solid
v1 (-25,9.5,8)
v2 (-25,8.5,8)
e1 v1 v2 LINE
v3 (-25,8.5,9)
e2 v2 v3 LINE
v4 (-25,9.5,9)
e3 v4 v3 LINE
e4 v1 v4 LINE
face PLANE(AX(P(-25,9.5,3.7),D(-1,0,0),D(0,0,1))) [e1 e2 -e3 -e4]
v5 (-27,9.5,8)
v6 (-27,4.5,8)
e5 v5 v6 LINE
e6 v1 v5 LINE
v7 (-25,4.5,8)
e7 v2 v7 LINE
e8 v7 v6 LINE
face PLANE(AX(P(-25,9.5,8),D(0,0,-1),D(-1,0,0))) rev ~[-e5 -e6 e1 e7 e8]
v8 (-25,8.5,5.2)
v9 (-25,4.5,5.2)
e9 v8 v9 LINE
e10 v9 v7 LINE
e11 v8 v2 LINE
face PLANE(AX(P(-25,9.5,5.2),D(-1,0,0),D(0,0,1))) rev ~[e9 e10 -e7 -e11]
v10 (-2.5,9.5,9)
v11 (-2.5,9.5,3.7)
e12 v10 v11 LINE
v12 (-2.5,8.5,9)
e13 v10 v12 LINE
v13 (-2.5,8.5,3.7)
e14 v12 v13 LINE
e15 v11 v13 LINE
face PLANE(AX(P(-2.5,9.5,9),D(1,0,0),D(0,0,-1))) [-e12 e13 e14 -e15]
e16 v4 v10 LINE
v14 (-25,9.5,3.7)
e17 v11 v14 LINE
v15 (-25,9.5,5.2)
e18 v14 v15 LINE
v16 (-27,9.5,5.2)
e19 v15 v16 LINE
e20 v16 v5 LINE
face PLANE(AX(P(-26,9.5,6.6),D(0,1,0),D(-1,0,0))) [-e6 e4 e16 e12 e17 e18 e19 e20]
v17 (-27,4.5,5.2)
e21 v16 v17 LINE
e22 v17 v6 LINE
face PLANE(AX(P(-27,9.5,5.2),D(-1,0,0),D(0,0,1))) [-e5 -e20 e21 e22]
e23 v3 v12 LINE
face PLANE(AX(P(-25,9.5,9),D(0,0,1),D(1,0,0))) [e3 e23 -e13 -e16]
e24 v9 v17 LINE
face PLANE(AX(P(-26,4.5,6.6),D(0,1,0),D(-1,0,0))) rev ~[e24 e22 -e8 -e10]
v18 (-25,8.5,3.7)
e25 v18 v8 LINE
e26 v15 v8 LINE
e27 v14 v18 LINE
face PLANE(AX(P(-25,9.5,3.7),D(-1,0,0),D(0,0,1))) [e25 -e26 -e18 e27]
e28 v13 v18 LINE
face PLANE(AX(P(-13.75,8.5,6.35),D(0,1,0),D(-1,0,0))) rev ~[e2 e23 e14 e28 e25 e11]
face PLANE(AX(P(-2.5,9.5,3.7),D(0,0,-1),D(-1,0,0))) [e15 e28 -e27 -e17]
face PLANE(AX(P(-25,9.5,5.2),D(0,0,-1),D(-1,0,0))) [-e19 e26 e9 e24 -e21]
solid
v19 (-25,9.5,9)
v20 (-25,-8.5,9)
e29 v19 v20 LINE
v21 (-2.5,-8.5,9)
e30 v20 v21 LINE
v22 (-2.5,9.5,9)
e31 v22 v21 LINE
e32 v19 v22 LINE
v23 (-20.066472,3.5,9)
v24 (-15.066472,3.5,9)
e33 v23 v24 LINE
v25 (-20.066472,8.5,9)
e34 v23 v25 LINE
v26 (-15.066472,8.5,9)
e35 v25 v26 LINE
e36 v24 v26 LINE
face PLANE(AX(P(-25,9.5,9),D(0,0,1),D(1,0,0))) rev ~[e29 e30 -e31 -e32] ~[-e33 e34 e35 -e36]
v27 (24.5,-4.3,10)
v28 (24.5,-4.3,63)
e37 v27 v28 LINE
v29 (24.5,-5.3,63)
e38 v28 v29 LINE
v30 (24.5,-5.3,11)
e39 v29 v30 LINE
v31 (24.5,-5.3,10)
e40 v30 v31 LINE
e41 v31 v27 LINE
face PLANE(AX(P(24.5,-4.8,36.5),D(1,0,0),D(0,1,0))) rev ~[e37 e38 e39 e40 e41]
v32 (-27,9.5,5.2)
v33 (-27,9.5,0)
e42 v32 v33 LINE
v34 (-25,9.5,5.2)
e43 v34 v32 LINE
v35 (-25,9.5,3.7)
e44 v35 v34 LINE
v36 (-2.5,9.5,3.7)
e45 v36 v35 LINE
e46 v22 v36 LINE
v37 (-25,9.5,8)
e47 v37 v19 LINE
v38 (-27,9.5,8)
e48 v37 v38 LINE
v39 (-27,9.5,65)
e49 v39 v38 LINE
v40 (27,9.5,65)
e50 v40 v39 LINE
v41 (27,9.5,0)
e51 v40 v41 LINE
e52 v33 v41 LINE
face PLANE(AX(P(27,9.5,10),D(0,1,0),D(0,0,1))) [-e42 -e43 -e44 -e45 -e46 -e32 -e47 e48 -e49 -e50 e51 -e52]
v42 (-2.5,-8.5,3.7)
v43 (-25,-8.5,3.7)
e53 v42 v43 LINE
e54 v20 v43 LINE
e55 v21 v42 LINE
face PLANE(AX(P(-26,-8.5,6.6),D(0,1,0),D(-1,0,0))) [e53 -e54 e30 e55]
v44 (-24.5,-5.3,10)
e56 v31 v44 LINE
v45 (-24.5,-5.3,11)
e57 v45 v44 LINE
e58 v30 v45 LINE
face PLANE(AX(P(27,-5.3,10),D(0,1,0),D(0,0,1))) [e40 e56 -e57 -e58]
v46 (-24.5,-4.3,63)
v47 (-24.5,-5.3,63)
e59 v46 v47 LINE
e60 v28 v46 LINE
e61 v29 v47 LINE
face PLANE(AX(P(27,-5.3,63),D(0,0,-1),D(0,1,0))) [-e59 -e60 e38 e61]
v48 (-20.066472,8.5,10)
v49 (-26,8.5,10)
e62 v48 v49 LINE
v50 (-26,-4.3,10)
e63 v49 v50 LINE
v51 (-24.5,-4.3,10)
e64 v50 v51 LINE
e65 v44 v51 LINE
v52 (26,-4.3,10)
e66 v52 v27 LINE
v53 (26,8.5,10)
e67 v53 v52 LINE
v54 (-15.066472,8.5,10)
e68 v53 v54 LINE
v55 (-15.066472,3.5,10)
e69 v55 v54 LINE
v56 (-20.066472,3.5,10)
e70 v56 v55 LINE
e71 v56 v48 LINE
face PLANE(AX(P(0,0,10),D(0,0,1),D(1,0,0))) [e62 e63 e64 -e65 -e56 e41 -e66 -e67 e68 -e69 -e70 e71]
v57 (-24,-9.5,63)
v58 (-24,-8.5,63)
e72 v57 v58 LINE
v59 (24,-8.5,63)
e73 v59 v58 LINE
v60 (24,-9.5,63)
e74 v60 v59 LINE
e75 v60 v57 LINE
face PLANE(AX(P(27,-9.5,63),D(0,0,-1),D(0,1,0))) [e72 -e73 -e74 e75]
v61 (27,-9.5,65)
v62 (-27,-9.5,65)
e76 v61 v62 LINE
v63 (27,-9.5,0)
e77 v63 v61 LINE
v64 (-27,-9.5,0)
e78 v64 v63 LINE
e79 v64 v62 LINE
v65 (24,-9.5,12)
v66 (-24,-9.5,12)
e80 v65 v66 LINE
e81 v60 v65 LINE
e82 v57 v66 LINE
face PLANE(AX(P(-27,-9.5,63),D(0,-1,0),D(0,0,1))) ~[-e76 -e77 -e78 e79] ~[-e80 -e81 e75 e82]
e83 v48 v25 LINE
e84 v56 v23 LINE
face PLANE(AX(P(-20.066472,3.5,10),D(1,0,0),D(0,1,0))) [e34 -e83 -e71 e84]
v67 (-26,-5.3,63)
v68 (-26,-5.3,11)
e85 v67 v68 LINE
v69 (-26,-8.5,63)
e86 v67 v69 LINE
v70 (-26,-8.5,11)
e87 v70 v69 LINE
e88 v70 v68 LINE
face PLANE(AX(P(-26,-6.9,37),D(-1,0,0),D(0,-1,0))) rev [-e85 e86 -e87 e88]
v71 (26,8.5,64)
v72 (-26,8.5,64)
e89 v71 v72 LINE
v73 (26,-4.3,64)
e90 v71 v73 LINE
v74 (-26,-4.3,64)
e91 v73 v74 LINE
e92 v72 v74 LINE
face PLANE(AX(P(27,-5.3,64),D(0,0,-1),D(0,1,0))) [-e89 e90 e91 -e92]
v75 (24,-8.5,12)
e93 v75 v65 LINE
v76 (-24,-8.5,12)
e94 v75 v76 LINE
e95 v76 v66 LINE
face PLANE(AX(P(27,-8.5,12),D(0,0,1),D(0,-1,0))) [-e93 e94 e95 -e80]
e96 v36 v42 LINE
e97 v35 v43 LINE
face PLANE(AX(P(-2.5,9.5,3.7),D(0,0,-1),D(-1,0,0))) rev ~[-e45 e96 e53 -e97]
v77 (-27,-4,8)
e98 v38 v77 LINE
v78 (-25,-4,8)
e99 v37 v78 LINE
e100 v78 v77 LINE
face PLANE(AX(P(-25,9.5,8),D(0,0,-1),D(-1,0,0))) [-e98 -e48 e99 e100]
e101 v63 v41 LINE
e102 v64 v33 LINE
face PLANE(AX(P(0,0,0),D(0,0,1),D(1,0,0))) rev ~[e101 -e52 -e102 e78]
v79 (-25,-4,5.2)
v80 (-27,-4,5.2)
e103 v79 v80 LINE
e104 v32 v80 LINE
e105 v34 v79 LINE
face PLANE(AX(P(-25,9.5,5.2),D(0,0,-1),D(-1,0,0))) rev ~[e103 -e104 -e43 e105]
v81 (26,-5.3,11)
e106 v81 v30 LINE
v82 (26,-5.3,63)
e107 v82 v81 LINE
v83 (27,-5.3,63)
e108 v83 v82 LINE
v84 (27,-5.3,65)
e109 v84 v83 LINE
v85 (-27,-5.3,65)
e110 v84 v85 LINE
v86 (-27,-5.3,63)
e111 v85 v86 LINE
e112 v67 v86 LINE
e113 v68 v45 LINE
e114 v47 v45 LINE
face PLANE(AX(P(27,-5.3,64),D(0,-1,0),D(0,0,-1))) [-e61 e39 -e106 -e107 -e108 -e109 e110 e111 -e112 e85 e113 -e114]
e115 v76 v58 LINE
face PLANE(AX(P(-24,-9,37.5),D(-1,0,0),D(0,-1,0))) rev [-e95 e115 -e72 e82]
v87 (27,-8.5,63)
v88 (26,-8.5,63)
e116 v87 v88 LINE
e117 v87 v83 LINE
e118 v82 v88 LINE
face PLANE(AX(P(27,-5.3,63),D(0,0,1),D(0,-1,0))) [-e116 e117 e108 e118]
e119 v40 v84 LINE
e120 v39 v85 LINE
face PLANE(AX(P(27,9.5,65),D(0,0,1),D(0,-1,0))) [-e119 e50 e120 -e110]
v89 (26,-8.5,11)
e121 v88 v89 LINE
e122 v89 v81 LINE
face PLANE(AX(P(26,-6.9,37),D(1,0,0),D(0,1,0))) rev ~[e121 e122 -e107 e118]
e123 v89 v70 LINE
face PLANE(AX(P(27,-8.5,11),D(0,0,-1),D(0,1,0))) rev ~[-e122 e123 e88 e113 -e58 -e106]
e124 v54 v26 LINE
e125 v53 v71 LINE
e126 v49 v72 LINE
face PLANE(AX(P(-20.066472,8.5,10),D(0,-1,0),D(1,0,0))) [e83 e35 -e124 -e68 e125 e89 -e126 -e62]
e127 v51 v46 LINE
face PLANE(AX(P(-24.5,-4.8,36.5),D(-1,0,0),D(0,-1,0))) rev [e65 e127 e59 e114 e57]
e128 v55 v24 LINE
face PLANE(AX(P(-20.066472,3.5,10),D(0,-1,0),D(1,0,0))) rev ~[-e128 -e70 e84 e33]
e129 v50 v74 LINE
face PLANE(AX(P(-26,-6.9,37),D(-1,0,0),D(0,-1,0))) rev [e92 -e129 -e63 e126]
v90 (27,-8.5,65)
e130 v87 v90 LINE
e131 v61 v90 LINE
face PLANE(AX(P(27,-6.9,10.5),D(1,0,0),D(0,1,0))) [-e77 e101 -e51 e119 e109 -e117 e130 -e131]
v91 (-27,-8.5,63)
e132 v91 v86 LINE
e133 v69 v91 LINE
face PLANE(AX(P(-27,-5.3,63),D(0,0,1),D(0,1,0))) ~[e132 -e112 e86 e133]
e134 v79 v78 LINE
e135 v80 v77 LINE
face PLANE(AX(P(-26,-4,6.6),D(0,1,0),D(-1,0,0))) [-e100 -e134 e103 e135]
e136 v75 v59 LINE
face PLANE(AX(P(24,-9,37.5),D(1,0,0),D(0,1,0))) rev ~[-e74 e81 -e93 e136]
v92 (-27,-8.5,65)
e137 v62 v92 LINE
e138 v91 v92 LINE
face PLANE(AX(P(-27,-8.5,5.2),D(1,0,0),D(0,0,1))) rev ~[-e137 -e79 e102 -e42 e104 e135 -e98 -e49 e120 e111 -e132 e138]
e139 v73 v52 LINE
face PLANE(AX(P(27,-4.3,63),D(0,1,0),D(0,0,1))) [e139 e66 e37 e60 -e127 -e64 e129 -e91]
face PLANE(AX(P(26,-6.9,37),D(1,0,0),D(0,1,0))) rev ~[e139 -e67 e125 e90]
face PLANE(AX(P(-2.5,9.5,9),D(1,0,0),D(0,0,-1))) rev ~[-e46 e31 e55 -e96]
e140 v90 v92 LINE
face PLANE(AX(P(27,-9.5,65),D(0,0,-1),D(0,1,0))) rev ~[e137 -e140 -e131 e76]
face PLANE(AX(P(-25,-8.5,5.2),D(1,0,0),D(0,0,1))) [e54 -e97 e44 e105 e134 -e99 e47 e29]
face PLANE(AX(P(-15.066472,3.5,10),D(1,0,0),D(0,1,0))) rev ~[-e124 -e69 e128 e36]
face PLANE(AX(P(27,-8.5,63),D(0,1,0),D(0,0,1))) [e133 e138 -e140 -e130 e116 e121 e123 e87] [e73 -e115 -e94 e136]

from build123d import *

# Parameters (mm, degrees)
F0_W      = 54
F0_H      = 19
F1_DEPTH  = 10
F2_W      = 1
F2_H      = 51
F3_DEPTH  = 3
F2_H_2    = 1
F4_DEPTH  = 1
F2_H_3    = 54
F5_DEPTH  = 54
F2_W_2    = 3.2
F6_DEPTH  = 1
F2_H_4    = 2
F7_DEPTH  = 54
F8_DEPTH  = 2.5
F10_W     = 2
F10_H     = 2.8
F11_DEPTH = 18
F12_W     = 2
F12_H     = 2.8
F13_DEPTH = 4.5
F14_DEPTH = 1
F15_DEPTH = 5
F16_W     = 5
F16_H     = 5
F17_DEPTH = 1


# Not quite as in the source:
# - a feature names something its author has since deleted; it is built from what else it names


with BuildPart() as f1:
    # F0 (on Top) → F1 (new body)
    with BuildSketch(Plane.XY):
        Rectangle(F0_W, F0_H)
    extrude(amount=F1_DEPTH)

    # F2 (on face) → F3 (join)
    with BuildSketch(Plane.YZ.offset(27)):
        with Locations((-9, 37.5)):
            Rectangle(F2_W, F2_H)
        Polygon((-9.5, 12), (-9.5, 10), (-8.5, 10), (-8.5, 11), (-8.5, 12), align=None)
    extrude(amount=-F3_DEPTH)

    # F2 (on face) → F4 (join)
    with BuildSketch(Plane.YZ.offset(27)):
        Polygon((-5.3, 11), (-5.3, 10), (-4.3, 10), (-4.3, 63), (-5.3, 63), align=None)
        Polygon((-4.3, 63), (-4.3, 10), (8.5, 10), (8.5, 64), (-4.3, 64), align=None)
        with Locations((-4.8, 63.5)):
            Rectangle(F2_W, F2_H_2)
    extrude(amount=-F4_DEPTH)

    # F2 (on face) → F5 (join, through all)
    with BuildSketch(Plane.YZ.offset(27)):
        with Locations((9, 37)):
            Rectangle(F2_W, F2_H_3)
        Polygon((8.5, 64), (9.5, 64), (9.5, 65), (-5.3, 65), (-5.3, 64), (-4.3, 64), align=None)
    extrude(amount=-F5_DEPTH)

    # F2 (on face) → F6 (join)
    with BuildSketch(Plane.YZ.offset(27)):
        Polygon((-8.5, 12), (-8.5, 11), (-5.3, 11), (-5.3, 63), (-8.5, 63), align=None)
        with Locations((-6.9, 10.5)):
            Rectangle(F2_W_2, F2_H_2)
    extrude(amount=-F6_DEPTH)

    # F2 (on face) → F7 (join, through all)
    with BuildSketch(Plane.YZ.offset(27)):
        with Locations((-6.9, 10.5)):
            Rectangle(F2_W_2, F2_H_2)
        Polygon((-9.5, 12), (-9.5, 10), (-8.5, 10), (-8.5, 11), (-8.5, 12), align=None)
        with Locations((-4.8, 63.5)):
            Rectangle(F2_W, F2_H_2)
        with Locations((-9, 64)):
            Rectangle(F2_W, F2_H_4)
    extrude(amount=-F7_DEPTH)

    # F2 (on face) → F8 (join)
    with BuildSketch(Plane.YZ.offset(27)):
        Polygon((-5.3, 11), (-5.3, 10), (-4.3, 10), (-4.3, 63), (-5.3, 63), align=None)
    extrude(amount=-F8_DEPTH)

    # F9: F1 across plane


with BuildPart() as f1_1:
    add(f1.part)
    add(f1.part.mirror(Plane.YZ))

    # F10 (on face) → F11 (cut)
    with BuildSketch(Plane(origin=(0, 9.5, 0), x_dir=(-1, 0, 0), z_dir=(0, 1, 0))):
        with Locations((26, 6.6)):
            Rectangle(F10_W, F10_H)
        Polygon((25, 3.7), (25, 5.2), (25, 8), (25, 9), (2.5, 9), (2.5, 8), (2.5, 3.7), align=None)
    extrude(amount=-F11_DEPTH, mode=Mode.SUBTRACT)

    # F12 (on face) → F13 (join)
    with BuildSketch(Plane(origin=(0, -8.5, 0), x_dir=(-1, 0, 0), z_dir=(0, 1, 0))):
        with Locations((26, 6.6)):
            Rectangle(F12_W, F12_H)
    extrude(amount=F13_DEPTH)

    # F16 (on face) → F17 (cut, through all)
    with BuildSketch(Plane.XY.offset(10)):
        with Locations((-17.5664718822, 6)):
            Rectangle(F16_W, F16_H)
    extrude(amount=-F17_DEPTH, mode=Mode.SUBTRACT)


with BuildPart() as f14:
    # F10 (on face) → F14 (new body)
    with BuildSketch(Plane(origin=(0, 9.5, 0), x_dir=(-1, 0, 0), z_dir=(0, 1, 0))):
        Polygon((25, 3.7), (25, 5.2), (25, 8), (25, 9), (2.5, 9), (2.5, 8), (2.5, 3.7), align=None)
    extrude(amount=-F14_DEPTH)

    # F10 (on face) → F15 (join)
    with BuildSketch(Plane(origin=(0, 9.5, 0), x_dir=(-1, 0, 0), z_dir=(0, 1, 0))):
        with Locations((26, 6.6)):
            Rectangle(F10_W, F10_H)
    extrude(amount=-F15_DEPTH)


solid = Compound([f1_1.part, f14.part])
